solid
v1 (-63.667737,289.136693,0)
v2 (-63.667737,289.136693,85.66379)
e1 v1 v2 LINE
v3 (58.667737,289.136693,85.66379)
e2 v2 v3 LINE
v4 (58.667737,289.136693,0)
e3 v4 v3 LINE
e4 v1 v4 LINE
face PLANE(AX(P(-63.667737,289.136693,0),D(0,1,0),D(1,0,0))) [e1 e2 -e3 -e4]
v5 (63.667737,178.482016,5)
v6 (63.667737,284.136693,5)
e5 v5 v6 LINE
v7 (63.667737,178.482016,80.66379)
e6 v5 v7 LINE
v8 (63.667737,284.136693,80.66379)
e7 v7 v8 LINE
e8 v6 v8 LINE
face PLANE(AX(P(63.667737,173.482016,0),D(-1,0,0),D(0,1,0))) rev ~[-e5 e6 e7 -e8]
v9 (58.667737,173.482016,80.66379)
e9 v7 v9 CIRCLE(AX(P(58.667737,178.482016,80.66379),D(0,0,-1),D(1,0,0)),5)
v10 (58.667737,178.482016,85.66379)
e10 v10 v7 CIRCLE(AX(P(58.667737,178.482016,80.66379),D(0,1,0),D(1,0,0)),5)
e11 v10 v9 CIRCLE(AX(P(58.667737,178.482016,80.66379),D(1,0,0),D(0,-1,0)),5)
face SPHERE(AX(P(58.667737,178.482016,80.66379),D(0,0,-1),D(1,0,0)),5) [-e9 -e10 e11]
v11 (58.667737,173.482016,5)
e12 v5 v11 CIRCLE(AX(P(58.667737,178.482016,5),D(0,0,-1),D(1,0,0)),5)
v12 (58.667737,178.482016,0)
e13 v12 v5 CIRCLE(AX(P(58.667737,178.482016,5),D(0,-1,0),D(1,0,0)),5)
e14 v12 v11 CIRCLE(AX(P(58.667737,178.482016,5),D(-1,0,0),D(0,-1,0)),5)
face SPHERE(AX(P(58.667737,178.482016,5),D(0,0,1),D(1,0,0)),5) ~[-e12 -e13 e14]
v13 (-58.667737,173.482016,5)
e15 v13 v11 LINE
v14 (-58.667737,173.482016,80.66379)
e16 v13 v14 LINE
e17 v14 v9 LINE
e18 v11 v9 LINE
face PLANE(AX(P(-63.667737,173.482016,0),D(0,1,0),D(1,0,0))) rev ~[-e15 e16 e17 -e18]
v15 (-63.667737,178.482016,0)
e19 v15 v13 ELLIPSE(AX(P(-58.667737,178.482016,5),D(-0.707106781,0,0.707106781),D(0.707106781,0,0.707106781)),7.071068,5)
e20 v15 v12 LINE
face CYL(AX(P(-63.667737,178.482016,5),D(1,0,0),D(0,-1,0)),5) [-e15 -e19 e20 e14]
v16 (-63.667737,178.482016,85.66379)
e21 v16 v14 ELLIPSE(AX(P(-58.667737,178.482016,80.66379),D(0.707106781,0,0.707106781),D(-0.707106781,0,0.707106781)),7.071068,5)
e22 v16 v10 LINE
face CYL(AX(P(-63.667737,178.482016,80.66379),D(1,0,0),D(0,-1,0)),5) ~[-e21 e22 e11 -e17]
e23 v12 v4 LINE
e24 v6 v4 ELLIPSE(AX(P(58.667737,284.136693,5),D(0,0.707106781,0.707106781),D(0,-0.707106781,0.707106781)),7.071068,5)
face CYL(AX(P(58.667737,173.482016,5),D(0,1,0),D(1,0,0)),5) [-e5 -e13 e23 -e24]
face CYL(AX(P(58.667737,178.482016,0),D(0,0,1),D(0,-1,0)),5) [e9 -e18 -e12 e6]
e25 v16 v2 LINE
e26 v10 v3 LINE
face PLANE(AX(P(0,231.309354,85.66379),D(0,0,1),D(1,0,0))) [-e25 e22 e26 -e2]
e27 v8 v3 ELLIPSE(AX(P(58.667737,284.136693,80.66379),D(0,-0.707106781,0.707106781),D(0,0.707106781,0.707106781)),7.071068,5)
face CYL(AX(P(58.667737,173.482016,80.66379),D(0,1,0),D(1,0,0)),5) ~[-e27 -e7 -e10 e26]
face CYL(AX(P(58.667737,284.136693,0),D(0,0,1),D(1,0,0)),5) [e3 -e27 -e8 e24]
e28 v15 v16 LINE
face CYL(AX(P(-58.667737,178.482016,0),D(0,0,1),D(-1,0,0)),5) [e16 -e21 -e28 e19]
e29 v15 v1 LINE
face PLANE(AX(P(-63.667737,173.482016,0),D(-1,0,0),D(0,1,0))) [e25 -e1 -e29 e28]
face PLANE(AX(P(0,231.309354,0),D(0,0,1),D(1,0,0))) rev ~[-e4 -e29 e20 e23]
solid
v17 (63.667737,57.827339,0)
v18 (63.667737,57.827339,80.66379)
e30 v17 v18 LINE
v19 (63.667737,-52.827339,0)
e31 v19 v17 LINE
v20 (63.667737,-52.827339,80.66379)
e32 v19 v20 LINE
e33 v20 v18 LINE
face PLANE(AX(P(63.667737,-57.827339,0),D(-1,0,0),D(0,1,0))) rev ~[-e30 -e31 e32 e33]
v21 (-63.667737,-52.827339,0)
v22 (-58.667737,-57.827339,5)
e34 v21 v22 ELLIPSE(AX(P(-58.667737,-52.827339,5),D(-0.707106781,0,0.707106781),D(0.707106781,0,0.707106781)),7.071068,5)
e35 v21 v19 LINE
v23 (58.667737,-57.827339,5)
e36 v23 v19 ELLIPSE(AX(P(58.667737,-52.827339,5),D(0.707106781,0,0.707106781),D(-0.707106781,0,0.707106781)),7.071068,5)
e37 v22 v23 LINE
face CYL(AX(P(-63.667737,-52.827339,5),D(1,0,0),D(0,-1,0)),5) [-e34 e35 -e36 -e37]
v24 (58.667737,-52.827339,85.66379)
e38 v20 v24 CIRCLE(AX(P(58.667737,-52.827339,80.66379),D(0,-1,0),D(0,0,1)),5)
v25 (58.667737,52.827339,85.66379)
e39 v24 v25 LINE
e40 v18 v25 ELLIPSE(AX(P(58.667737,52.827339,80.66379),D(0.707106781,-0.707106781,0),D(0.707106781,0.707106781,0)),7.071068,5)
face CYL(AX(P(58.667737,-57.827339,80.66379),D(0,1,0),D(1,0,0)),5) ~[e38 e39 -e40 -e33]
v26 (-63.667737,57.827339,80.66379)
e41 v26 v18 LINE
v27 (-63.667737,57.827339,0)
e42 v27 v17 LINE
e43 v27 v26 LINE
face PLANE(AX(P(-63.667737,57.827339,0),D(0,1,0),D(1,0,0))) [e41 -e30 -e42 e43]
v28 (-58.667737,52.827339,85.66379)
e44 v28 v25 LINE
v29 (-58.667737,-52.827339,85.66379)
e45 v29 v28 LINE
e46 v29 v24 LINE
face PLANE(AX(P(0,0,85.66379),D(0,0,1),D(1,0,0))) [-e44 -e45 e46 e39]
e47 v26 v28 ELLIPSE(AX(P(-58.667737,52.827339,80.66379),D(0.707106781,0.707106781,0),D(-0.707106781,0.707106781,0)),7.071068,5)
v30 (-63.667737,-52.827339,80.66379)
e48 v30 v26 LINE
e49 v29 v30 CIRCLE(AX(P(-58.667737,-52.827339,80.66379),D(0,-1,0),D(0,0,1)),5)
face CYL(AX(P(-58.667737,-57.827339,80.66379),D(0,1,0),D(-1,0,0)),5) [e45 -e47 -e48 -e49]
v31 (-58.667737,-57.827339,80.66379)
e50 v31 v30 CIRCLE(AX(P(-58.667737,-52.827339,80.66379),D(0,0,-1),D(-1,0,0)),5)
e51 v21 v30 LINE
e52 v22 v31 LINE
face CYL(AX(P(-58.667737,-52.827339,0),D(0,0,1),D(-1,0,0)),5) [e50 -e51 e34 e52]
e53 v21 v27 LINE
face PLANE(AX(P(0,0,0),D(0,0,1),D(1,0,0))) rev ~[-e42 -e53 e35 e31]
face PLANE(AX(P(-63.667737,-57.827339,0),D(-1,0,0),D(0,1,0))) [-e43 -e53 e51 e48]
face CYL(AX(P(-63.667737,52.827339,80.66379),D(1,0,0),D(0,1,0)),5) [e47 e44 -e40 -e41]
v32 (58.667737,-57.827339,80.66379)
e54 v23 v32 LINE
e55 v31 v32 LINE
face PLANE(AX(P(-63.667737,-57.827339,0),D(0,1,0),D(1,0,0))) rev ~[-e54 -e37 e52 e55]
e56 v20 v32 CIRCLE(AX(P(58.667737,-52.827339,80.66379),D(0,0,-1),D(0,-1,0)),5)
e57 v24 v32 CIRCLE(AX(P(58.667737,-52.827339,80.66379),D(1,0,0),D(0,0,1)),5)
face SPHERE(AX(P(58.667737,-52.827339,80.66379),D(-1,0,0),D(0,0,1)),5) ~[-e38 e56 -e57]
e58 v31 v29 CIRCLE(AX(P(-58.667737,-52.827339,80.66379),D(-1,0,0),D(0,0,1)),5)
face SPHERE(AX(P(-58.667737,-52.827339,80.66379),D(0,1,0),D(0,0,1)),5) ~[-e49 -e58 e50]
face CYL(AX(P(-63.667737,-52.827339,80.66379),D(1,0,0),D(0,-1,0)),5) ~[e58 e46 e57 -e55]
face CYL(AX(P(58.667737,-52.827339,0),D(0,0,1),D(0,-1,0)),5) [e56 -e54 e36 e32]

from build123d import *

# Parameters (mm, degrees)
F0_W     = 127.3354738951
F0_H     = 115.6546771526
F1_DEPTH = 85.66379
F4_R     = 5
F4_2_R   = 5


with BuildPart() as f1:
    # F0 (on Top) → F1 (new body)
    with BuildSketch(Plane.XY):
        Rectangle(F0_W, F0_H)
    extrude(amount=F1_DEPTH)


with BuildPart() as f2_1:
    # F2: copy of F1
    add(f1.part.moved(Location((0, 115.6546771526, 0))))


with BuildPart() as f2_1_1:
    # F3: moved
    add(f2_1.part.moved(Location((0, 115.6546771526, 0))))

    # F4
    f4_edges = [f2_1_1.edges().sort_by_distance(p)[0] for p in [
        (63.667737, 173.482016, 42.831895),
        (63.667737, 289.136693, 42.831895),
        (63.667737, 231.309354, 0),
        (63.667737, 231.309354, 85.66379),
        (-63.667737, 173.482016, 42.831895),
        (0, 173.482016, 0),
        (0, 173.482016, 85.66379),
    ]]
    fillet(f4_edges, radius=F4_R)


with BuildPart() as f1_1:
    add(f1.part)

    # F4#2
    f4_2_edges = [f1_1.edges().sort_by_distance(p)[0] for p in [
        (-63.667737, 0, 85.66379),
        (0, -57.827339, 85.66379),
        (63.667737, 0, 85.66379),
        (0, 57.827339, 85.66379),
        (-63.667737, -57.827339, 42.831895),
        (63.667737, -57.827339, 42.831895),
        (0, -57.827339, 0),
    ]]
    fillet(f4_2_edges, radius=F4_2_R)


solid = Compound([f2_1_1.part, f1_1.part])
